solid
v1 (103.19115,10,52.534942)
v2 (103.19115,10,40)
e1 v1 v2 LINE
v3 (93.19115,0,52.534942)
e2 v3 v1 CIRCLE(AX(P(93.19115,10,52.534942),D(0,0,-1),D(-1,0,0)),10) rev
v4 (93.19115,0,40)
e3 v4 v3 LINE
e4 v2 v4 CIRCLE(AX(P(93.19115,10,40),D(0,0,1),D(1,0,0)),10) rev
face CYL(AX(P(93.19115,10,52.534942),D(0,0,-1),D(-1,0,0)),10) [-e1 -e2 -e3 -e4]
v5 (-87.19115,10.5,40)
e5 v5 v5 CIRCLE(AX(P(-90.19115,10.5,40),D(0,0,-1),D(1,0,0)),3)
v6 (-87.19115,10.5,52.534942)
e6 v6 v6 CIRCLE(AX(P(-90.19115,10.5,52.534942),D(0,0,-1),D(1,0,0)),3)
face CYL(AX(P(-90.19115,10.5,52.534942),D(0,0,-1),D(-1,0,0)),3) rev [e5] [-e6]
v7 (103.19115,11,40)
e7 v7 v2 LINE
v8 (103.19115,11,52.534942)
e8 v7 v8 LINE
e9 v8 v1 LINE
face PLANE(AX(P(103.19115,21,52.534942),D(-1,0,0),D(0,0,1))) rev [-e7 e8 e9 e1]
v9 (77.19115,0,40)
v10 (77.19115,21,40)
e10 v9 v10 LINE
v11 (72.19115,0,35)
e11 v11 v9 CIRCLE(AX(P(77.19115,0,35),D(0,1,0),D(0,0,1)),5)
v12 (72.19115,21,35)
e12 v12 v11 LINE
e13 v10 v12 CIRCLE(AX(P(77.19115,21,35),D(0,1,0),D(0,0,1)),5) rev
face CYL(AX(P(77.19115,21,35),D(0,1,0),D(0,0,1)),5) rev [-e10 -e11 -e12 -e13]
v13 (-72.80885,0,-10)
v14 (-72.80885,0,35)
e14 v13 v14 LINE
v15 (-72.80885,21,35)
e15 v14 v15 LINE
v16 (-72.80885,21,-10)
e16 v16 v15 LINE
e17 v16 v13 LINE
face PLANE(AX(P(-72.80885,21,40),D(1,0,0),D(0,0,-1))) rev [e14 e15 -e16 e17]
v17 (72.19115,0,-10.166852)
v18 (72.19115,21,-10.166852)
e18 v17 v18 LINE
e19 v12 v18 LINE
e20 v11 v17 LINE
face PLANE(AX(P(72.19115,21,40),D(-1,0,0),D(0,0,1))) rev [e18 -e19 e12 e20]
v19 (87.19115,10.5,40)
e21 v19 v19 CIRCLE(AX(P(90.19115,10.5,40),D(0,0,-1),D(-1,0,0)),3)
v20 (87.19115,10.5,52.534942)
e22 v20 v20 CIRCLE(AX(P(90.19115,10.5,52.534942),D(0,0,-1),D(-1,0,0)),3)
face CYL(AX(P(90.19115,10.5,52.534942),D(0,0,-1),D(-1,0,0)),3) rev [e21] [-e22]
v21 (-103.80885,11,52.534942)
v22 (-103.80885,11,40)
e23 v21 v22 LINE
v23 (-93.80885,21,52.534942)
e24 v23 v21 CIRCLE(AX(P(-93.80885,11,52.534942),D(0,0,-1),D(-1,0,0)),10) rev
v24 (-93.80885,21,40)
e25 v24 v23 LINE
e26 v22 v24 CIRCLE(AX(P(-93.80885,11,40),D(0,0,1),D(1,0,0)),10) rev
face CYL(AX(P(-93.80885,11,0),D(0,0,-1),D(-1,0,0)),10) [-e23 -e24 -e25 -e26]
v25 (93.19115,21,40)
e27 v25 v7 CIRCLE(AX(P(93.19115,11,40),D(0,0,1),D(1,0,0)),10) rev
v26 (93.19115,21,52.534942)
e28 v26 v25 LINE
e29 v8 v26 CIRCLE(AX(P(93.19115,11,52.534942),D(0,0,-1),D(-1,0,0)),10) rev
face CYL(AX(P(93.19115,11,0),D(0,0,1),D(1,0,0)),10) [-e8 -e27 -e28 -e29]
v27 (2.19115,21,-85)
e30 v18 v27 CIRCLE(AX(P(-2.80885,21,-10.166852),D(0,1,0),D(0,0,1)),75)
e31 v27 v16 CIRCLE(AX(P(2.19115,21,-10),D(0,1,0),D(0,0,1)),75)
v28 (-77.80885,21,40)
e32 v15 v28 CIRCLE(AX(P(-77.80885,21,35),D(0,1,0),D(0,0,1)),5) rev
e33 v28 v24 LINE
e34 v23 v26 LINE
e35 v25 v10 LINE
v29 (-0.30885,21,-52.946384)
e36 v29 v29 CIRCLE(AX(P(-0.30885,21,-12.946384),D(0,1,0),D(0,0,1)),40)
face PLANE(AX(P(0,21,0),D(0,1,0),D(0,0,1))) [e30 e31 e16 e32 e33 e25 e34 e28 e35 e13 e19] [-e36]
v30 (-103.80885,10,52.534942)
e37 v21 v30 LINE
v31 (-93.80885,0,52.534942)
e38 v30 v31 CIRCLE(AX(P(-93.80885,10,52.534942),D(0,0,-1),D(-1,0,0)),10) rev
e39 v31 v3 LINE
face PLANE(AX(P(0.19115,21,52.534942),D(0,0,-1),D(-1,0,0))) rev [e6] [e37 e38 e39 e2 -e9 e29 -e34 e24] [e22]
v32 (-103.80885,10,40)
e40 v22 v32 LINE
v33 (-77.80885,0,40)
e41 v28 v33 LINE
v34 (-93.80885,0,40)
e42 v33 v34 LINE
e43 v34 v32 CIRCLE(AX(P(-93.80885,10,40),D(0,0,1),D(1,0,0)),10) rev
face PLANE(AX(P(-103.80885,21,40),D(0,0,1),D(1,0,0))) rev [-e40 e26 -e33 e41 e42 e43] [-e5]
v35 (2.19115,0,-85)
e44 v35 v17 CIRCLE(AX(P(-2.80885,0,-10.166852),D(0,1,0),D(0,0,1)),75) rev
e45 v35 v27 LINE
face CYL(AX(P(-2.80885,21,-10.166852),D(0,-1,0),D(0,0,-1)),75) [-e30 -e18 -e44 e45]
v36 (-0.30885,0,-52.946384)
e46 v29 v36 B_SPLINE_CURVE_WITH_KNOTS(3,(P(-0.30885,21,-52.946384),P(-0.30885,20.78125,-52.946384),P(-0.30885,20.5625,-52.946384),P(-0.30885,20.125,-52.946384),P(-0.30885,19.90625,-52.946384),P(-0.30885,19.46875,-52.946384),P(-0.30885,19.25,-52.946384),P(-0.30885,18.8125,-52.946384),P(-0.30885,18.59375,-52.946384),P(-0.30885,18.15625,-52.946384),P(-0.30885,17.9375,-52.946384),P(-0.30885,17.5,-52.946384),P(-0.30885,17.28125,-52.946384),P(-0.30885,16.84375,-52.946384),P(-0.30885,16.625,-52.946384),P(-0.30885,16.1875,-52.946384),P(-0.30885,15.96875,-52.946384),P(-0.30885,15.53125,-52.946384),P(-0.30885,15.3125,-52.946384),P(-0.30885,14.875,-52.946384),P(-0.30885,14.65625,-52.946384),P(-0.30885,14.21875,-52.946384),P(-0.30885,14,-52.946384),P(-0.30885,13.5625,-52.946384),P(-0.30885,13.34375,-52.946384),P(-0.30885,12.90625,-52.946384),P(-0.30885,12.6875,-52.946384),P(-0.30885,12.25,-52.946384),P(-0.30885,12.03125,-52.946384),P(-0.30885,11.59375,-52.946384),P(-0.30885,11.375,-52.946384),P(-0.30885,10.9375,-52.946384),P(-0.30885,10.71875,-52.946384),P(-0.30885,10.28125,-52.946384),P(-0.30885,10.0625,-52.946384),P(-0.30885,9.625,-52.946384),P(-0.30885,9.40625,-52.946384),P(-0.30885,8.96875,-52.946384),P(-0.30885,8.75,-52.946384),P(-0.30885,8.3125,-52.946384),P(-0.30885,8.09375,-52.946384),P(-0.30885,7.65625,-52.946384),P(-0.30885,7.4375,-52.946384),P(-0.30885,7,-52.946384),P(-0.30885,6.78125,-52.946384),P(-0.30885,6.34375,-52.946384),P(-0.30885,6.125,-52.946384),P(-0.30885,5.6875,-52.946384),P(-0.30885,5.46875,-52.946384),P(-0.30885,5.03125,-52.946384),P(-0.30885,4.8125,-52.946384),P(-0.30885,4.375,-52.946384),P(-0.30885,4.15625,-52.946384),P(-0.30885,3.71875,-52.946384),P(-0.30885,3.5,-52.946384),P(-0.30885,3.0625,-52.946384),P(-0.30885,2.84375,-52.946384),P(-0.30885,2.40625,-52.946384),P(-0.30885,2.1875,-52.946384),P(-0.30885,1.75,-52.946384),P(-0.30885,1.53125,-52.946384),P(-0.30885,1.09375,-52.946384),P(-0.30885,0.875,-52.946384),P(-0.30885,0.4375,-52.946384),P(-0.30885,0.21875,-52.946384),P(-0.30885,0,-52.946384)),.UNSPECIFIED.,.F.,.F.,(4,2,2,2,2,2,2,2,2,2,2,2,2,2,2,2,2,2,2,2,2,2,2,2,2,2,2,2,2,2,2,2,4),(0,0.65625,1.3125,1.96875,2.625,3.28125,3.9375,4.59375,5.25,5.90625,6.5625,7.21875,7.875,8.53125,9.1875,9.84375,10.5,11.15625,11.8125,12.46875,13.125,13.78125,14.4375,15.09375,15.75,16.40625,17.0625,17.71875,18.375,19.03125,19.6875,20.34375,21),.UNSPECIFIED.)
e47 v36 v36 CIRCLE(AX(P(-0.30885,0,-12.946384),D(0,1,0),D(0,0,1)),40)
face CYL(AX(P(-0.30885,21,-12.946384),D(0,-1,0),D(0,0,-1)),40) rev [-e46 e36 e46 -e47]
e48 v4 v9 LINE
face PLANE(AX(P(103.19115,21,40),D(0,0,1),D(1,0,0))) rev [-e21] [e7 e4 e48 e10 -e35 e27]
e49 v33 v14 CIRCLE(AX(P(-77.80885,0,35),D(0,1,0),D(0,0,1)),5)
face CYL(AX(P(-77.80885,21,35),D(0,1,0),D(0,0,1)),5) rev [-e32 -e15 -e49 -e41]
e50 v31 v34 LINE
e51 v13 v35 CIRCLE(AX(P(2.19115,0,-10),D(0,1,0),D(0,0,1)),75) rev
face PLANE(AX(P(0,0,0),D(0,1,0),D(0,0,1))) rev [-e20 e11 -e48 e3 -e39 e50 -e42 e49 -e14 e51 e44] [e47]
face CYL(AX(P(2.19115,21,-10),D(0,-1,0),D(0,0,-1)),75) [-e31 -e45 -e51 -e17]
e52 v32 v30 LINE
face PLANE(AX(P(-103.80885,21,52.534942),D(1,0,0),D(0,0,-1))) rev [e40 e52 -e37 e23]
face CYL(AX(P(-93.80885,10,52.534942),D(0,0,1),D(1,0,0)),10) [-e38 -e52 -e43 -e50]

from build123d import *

# Parameters (mm, degrees)
SKETCH1_R           = 40
BOSS_EXTRUDE1_DEPTH = 21
FILLET1_R           = 10
FILLET2_R           = 10
FILLET3_R           = 10
FILLET4_R           = 10
FILLET5_R           = 5
FILLET6_R           = 5
FILLET7_R           = 75
FILLET8_R           = 75
SKETCH2_R           = 3
CUT_EXTRUDE1_DEPTH  = 164.836129338


with BuildPart() as part:
    # Sketch1 → Boss-Extrude1 (new body)
    with BuildSketch(Plane(origin=(0, 0, 0), x_dir=(1, 0, 0), z_dir=(0, 1, 0))):
        Polygon((0.191150297, -52.534941872), (103.191150297, -52.534941872), (103.191150297, -40), (72.191150297, -40), (72.191150297, 85), (0.191150297, 85), (-72.808849703, 85), (-72.808849703, -40), (-103.808849703, -40), (-103.808849703, -52.534941872), align=None)
        with Locations(Location((-0.308849703, 12.94638448, 0), (0, 0, 90))):
            Circle(SKETCH1_R, mode=Mode.SUBTRACT)
    extrude(amount=BOSS_EXTRUDE1_DEPTH)

    # Fillet1
    fillet1_edges = [part.edges().sort_by_distance(p)[0] for p in [
        (103.191150297, 21, 46.267470936),
    ]]
    fillet(fillet1_edges, radius=FILLET1_R)

    # Fillet2
    fillet2_edges = [part.edges().sort_by_distance(p)[0] for p in [
        (-103.808849703, 21, 46.267470936),
    ]]
    fillet(fillet2_edges, radius=FILLET2_R)

    # Fillet3
    fillet3_edges = [part.edges().sort_by_distance(p)[0] for p in [
        (-103.808849703, 0, 46.267470936),
    ]]
    fillet(fillet3_edges, radius=FILLET3_R)

    # Fillet4
    fillet4_edges = [part.edges().sort_by_distance(p)[0] for p in [
        (103.191150297, 0, 46.267470936),
    ]]
    fillet(fillet4_edges, radius=FILLET4_R)

    # Fillet5
    fillet5_edges = [part.edges().sort_by_distance(p)[0] for p in [
        (72.191150297, 10.5, 40),
    ]]
    fillet(fillet5_edges, radius=FILLET5_R)

    # Fillet6
    fillet6_edges = [part.edges().sort_by_distance(p)[0] for p in [
        (-72.808849703, 10.5, 40),
    ]]
    fillet(fillet6_edges, radius=FILLET6_R)

    # Fillet7
    fillet7_edges = [part.edges().sort_by_distance(p)[0] for p in [
        (-72.808849703, 10.5, -85),
    ]]
    fillet(fillet7_edges, radius=FILLET7_R)

    # Fillet8
    # the kernel refuses this fillet: 75 mm, written as the material it takes off along each edge
    with BuildSketch(Plane(origin=(72.191150297, -187.082869339, -85), x_dir=(-1, 0, 0), z_dir=(0, 1, 0))) as fillet8_piece_1:
        with BuildLine():
            CenterArc((75, 74.833147735), FILLET8_R, 180, 86.177446271)
            Line((0, 74.833147735), (-1.5, 74.833147735))
            Line((-1.5, 74.833147735), (-1.5, 0))
            Line((-1.5, 0), (0, -1.5))
            ThreePointArc((0, -1.5), (35, -1.5), (69.9, -1.496662955))
            Line((69.9, -1.496662955), (70, 0))
        make_face()
    extrude(amount=395.165738677, mode=Mode.SUBTRACT)

    # Sketch2 → Cut-Extrude1 (cut, through all)
    with BuildSketch(Plane(origin=(0, 0, 40), x_dir=(-1, 0, 0), z_dir=(0, 0, -1))):
        with Locations((-90.191150297, 10.5)):
            Circle(SKETCH2_R)
        with Locations(Location((90.191150297, 10.5, 0), (0, 0, 180))):
            Circle(SKETCH2_R)
    extrude(amount=-CUT_EXTRUDE1_DEPTH, mode=Mode.SUBTRACT)


solid = part.part
